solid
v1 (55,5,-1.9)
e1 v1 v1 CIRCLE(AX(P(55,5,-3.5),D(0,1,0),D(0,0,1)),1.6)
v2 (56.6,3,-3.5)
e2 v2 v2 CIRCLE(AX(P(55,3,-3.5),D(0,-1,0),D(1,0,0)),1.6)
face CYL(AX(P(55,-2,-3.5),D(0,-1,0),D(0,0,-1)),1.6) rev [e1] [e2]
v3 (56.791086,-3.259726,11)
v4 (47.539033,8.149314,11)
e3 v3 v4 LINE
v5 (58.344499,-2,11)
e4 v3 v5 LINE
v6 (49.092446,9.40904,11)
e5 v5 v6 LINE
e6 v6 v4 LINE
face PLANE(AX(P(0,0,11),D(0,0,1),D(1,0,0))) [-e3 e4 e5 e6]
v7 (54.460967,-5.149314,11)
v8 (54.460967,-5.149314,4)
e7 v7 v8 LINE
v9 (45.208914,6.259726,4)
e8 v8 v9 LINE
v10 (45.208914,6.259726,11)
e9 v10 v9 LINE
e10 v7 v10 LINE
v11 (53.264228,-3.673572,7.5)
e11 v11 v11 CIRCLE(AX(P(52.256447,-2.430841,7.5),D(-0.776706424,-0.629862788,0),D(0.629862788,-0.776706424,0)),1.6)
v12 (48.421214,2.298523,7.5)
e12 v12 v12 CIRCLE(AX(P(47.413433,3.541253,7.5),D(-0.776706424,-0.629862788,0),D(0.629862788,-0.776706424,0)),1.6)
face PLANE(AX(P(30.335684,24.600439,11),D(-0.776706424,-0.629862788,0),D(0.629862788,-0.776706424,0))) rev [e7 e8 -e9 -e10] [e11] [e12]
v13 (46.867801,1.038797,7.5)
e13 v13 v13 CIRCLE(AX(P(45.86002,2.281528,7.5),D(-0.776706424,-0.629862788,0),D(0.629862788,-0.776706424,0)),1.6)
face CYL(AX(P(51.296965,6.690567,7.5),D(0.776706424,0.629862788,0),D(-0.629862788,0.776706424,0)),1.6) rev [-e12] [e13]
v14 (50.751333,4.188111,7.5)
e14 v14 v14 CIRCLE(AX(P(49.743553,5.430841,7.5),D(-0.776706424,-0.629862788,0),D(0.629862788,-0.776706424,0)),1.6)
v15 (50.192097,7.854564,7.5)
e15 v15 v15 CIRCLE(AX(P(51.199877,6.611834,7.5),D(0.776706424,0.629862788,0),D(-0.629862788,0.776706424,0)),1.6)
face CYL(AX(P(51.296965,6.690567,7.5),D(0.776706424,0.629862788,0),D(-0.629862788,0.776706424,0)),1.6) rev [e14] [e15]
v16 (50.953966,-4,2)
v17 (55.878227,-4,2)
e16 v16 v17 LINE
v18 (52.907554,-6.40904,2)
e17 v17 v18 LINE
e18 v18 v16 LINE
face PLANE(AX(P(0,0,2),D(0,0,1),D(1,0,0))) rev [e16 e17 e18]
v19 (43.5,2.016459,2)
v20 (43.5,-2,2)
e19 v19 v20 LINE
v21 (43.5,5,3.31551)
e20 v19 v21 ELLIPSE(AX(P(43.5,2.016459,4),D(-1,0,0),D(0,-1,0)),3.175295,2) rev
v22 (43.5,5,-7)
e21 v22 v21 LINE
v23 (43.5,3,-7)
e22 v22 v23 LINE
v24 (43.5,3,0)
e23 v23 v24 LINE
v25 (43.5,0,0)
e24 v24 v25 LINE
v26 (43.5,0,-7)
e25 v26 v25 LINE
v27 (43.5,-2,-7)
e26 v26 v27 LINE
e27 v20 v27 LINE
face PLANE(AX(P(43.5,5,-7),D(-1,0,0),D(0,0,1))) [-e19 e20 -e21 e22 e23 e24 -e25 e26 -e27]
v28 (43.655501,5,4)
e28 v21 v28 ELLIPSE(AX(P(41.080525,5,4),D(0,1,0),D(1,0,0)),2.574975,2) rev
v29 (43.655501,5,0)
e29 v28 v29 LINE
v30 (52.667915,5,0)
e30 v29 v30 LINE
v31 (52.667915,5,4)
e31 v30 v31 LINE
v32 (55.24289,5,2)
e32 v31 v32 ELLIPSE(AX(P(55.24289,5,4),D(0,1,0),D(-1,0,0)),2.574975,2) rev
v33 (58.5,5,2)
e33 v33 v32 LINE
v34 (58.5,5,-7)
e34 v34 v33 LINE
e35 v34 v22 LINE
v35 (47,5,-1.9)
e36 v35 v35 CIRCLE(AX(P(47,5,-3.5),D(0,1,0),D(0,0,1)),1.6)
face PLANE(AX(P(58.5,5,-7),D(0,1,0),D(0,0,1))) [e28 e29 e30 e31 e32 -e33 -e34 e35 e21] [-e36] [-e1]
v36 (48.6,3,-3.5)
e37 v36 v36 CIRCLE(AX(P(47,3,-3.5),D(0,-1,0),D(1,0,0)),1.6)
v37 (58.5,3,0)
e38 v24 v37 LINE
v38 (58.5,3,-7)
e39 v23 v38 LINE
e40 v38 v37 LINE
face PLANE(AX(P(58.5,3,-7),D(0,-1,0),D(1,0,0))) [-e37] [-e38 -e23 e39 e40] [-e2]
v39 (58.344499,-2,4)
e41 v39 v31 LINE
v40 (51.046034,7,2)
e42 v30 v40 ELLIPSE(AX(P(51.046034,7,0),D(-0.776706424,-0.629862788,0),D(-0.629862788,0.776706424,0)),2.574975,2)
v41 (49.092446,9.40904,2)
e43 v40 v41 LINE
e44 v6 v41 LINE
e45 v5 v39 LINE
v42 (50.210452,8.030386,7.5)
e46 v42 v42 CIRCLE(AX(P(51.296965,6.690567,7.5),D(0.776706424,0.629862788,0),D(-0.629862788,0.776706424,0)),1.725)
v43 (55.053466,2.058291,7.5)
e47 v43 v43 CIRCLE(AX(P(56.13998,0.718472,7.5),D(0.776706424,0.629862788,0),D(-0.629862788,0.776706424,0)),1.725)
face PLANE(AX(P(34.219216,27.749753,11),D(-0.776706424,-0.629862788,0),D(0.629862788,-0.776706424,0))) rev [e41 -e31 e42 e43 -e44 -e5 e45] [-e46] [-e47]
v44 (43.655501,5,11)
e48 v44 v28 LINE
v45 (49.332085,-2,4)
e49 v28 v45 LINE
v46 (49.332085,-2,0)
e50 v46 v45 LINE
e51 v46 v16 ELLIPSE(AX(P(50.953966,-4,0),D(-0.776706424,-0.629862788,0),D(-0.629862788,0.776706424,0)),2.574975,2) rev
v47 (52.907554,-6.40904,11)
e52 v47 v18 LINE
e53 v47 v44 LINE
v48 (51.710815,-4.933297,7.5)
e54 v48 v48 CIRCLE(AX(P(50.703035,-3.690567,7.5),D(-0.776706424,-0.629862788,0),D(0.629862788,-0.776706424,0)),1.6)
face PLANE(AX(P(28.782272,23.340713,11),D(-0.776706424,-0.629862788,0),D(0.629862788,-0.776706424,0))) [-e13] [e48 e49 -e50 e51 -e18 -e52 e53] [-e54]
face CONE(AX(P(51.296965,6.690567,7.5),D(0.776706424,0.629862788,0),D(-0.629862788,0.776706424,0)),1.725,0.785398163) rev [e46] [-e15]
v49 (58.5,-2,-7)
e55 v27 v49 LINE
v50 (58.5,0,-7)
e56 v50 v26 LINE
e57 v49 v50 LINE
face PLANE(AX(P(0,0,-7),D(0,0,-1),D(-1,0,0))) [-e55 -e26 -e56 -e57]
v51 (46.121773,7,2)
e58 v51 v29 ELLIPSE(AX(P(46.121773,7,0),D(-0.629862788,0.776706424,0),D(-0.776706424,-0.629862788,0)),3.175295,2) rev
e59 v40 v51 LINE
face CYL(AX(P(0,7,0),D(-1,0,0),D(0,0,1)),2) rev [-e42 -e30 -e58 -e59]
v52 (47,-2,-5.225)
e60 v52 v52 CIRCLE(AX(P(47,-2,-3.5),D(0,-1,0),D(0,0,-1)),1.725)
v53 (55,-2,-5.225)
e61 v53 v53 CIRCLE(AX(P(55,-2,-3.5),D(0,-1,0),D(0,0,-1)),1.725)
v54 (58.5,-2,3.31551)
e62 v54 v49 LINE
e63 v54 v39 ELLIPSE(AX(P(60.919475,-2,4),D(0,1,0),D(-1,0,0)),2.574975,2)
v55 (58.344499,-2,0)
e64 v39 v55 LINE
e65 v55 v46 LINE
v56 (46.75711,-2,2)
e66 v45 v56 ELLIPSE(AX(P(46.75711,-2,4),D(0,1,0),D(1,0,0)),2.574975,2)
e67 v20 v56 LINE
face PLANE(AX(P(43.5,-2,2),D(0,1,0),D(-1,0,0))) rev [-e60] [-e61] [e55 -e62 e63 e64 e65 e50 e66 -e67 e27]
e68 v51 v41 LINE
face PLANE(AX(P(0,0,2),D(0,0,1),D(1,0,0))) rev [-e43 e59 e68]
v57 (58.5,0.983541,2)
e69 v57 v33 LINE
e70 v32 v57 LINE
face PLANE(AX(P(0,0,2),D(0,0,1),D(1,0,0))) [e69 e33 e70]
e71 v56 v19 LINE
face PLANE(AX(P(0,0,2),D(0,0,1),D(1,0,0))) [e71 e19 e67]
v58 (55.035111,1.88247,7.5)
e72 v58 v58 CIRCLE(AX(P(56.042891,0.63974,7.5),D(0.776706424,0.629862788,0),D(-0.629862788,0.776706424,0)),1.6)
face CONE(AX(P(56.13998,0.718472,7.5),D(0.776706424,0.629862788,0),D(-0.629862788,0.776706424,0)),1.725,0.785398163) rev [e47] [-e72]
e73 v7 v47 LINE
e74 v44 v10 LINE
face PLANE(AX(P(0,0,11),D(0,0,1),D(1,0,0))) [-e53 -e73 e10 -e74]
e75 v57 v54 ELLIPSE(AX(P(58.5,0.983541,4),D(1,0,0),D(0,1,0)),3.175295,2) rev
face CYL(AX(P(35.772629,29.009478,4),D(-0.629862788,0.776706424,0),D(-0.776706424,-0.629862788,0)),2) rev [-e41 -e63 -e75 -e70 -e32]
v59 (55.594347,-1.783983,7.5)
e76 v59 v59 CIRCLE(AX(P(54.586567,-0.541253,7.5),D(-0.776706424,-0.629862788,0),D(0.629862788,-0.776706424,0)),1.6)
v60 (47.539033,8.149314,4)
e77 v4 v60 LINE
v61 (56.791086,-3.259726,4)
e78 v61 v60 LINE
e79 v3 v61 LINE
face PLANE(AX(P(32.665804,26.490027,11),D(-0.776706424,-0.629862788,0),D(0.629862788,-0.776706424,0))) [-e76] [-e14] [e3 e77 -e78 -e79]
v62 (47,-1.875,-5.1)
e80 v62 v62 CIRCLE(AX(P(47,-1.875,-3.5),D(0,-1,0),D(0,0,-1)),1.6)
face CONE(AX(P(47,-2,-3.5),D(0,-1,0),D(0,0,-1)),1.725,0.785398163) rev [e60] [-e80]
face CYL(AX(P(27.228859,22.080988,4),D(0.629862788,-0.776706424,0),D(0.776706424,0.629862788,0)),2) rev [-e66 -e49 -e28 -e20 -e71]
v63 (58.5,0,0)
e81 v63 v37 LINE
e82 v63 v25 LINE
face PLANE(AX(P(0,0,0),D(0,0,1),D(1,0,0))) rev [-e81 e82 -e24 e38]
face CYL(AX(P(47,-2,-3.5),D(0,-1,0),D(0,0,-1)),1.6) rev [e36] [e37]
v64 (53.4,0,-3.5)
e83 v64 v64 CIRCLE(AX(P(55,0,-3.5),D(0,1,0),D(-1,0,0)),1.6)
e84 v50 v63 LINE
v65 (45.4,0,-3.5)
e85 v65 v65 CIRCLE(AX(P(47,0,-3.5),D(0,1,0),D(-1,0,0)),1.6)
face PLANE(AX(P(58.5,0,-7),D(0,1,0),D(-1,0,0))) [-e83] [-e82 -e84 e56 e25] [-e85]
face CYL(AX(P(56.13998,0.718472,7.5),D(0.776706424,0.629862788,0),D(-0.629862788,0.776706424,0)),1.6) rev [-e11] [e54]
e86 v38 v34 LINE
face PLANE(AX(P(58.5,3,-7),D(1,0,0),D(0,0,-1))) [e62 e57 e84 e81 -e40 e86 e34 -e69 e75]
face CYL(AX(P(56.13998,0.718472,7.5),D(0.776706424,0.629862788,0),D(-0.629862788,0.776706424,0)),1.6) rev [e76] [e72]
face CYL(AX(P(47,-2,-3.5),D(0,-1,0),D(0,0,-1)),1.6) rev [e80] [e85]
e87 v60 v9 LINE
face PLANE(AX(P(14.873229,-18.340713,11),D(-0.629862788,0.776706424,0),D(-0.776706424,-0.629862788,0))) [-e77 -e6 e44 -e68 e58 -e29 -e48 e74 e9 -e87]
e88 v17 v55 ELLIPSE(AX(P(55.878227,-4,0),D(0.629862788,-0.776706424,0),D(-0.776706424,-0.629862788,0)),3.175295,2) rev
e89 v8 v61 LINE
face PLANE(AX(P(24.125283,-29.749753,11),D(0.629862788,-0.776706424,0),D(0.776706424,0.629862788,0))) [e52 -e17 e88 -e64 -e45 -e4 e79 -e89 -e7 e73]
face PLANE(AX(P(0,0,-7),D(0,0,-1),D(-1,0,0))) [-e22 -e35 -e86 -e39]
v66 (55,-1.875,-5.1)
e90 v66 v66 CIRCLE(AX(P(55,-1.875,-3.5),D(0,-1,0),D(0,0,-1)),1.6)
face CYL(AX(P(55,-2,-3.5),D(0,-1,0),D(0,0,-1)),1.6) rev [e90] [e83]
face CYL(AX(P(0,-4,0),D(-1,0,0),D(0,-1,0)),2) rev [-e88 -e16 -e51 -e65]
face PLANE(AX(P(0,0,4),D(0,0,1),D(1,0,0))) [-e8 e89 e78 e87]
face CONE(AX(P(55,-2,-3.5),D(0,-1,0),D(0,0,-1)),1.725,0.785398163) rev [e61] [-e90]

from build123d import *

# Parameters (mm, degrees)
SKETCH1_W                      = 15
SKETCH1_H                      = 2
BOSS_EXTRUDE1_DEPTH            = 7
BOSS_EXTRUDE1_2_DEPTH          = 7
SKETCH2_W                      = 15
SKETCH2_H                      = 7
BOSS_EXTRUDE2_DEPTH            = 2
BOSS_EXTRUDE3_DEPTH            = 9
BOSS_EXTRUDE4_DEPTH            = 2
M3_CLEARANCE_HOLE1_D           = 3.2
M3_CLEARANCE_HOLE1_CSINK_D     = 3.45
M3_CLEARANCE_HOLE1_CSINK_ANGLE = 90
M3_CLEARANCE_HOLE2_D           = 3.2
M3_CLEARANCE_HOLE2_CSINK_D     = 3.45
M3_CLEARANCE_HOLE2_CSINK_ANGLE = 90
FILLET2_R                      = 2
FILLET3_R                      = 2


with BuildPart() as part:
    # Sketch1 → Boss-Extrude1 (new body)
    with BuildSketch(Plane.XY):
        with Locations((51, 4)):
            Rectangle(SKETCH1_W, SKETCH1_H)
    extrude(amount=-BOSS_EXTRUDE1_DEPTH)



with BuildPart() as body_2:
    # Sketch1 → Boss-Extrude1 2 (new body)
    with BuildSketch(Plane.XY):
        with Locations((51, -1)):
            Rectangle(SKETCH1_W, SKETCH1_H)
    extrude(amount=-BOSS_EXTRUDE1_2_DEPTH)


with BuildPart() as part_1:
    add(part.part)

    add(body_2.part)  # Boss-Extrude2 merges body 2
    # Sketch2 → Boss-Extrude2 (add)
    with BuildSketch(Plane.XY):
        with Locations((51, 1.5)):
            Rectangle(SKETCH2_W, SKETCH2_H)
    extrude(amount=BOSS_EXTRUDE2_DEPTH)

    # Sketch3 → Boss-Extrude3 (add)
    with BuildSketch(Plane.XY.offset(2)):
        Polygon((49.332085067, -2), (51.907060552, -2), (46.23047622, 5), (43.655500735, 5), align=None)
        Polygon((52.9075543, -6.409039515), (54.460967148, -5.149313939), (51.907060552, -2), (49.332085067, -2), align=None)
        Polygon((50.092939448, 5), (55.76952378, -2), (58.344499265, -2), (52.667914933, 5), align=None)
        Polygon((47.539032852, 8.149313939), (50.092939448, 5), (52.667914933, 5), (49.0924457, 9.409039515), align=None)
        Polygon((43.655500735, 5), (46.23047622, 5), (45.208913582, 6.259725576), align=None)
        Polygon((58.344499265, -2), (55.76952378, -2), (56.791086418, -3.259725576), align=None)
    extrude(amount=BOSS_EXTRUDE3_DEPTH)

    # Sketch4 → Boss-Extrude4 (add)
    with BuildSketch(Plane.XY.offset(2)):
        Polygon((43.655500735, 5), (52.9075543, -6.409039515), (58.344499265, -2), (49.0924457, 9.409039515), align=None)
    extrude(amount=BOSS_EXTRUDE4_DEPTH)

    # M3 Clearance Hole1 (through all)
    with Locations(Plane(origin=(34.219216483, 27.749752594, 0), x_dir=(0, 0, -1), z_dir=(0.7767064235919557, 0.6298627878760529, 0))):
        with Locations((-7.5, -34.802441812), (-7.5, -27.113443281)):
            CounterSinkHole(M3_CLEARANCE_HOLE1_D / 2, M3_CLEARANCE_HOLE1_CSINK_D / 2, counter_sink_angle=M3_CLEARANCE_HOLE1_CSINK_ANGLE)

    # M3 Clearance Hole2 (through all)
    with Locations(Plane(origin=(0, -2, 0), x_dir=(-1, 0, 0), z_dir=(0, -1, 0))):
        with Locations((-47, 3.5), (-55, 3.5)):
            CounterSinkHole(M3_CLEARANCE_HOLE2_D / 2, M3_CLEARANCE_HOLE2_CSINK_D / 2, counter_sink_angle=M3_CLEARANCE_HOLE2_CSINK_ANGLE)

    # Fillet2
    # the kernel refuses this fillet: 2 mm, written as the material it adds along each edge
    with BuildSketch(Plane(origin=(63.344499265, -2, 2), x_dir=(0, -1, 0), z_dir=(-1, 0, 0))) as fillet2_piece_1_section:
        with BuildLine():
            CenterArc((FILLET2_R, -FILLET2_R), FILLET2_R, 90, 90)
            Line((0, -FILLET2_R), (0, 0))
            Line((0, 0), (FILLET2_R, 0))
        make_face()
    fillet2_piece_1 = extrude(amount=19.012414198, mode=Mode.PRIVATE)
    fillet2_piece_1 = split(fillet2_piece_1, bisect_by=Plane(origin=(51.286566394, -4.410141115, 1.532384034), z_dir=(0.776706423591956, 0.6298627878760524, 0)), keep=Keep.TOP, mode=Mode.PRIVATE)
    fillet2_piece_1 = split(fillet2_piece_1, bisect_by=Plane(origin=(55.372467702, -4.410141115, 1.532384034), z_dir=(-0.6298627878760494, 0.7767064235919585, 0)), keep=Keep.TOP, mode=Mode.PRIVATE)
    add(fillet2_piece_1)
    with BuildSketch(Plane(origin=(38.655500735, 5, 2), x_dir=(0, 0, -1), z_dir=(1, 0, 0))) as fillet2_piece_2_section:
        with BuildLine():
            CenterArc((FILLET2_R, FILLET2_R), FILLET2_R, 180, 90)
            Line((0, FILLET2_R), (0, 0))
            Line((0, 0), (FILLET2_R, 0))
        make_face()
    fillet2_piece_2 = extrude(amount=19.012414198, mode=Mode.PRIVATE)
    fillet2_piece_2 = split(fillet2_piece_2, bisect_by=Plane(origin=(46.627532298, 7.410141115, 1.532384034), z_dir=(0.6298627878760538, -0.776706423591955, 0)), keep=Keep.TOP, mode=Mode.PRIVATE)
    fillet2_piece_2 = split(fillet2_piece_2, bisect_by=Plane(origin=(50.713433606, 7.410141115, 1.532384034), z_dir=(-0.776706423591956, -0.6298627878760528, 0)), keep=Keep.TOP, mode=Mode.PRIVATE)
    add(fillet2_piece_2)

    # Fillet3
    # the kernel refuses this fillet: 2 mm, written as the material it adds along each edge
    with BuildSketch(Plane(origin=(52.481399006, -5.883532118, 2), x_dir=(-0.7767064235919561, -0.6298627878760525, 0), z_dir=(-0.6298627878760524, 0.7767064235919561, 0))) as fillet3_piece_1_section:
        with BuildLine():
            CenterArc((FILLET3_R, FILLET3_R), FILLET3_R, 180, 90)
            Line((0, FILLET3_R), (0, 0))
            Line((0, 0), (FILLET3_R, 0))
        make_face()
    fillet3_piece_1 = extrude(amount=19.012414198, mode=Mode.PRIVATE)
    fillet3_piece_1 = split(fillet3_piece_1, bisect_by=Plane(origin=(46.164389013, 5, 2.465360244), z_dir=(0, -1, 0)), keep=Keep.TOP, mode=Mode.PRIVATE)
    fillet3_piece_1 = split(fillet3_piece_1, bisect_by=Plane(origin=(43.5, 1.248668865, 2.465360244), z_dir=(1, 0, 0)), keep=Keep.TOP, mode=Mode.PRIVATE)
    fillet3_piece_1 = split(fillet3_piece_1, bisect_by=Plane(origin=(46.164389013, -2, 2.465360244), z_dir=(0, 1, 0)), keep=Keep.TOP, mode=Mode.PRIVATE)
    add(fillet3_piece_1)
    with BuildSketch(Plane(origin=(61.493813205, -5.883532118, 2), x_dir=(0, 0, 1), z_dir=(-0.6298627878760524, 0.776706423591956, 0))) as fillet3_piece_2_section:
        with BuildLine():
            CenterArc((FILLET3_R, FILLET3_R), FILLET3_R, 180, 90)
            Line((0, FILLET3_R), (0, 0))
            Line((0, 0), (FILLET3_R, 0))
        make_face()
    fillet3_piece_2 = extrude(amount=19.012414198, mode=Mode.PRIVATE)
    fillet3_piece_2 = split(fillet3_piece_2, bisect_by=Plane(origin=(58.444828917, 5, 2.691548942), z_dir=(0, -1, 0)), keep=Keep.TOP, mode=Mode.PRIVATE)
    fillet3_piece_2 = split(fillet3_piece_2, bisect_by=Plane(origin=(58.5, -1.960151195, 2.691548942), z_dir=(-1, 0, 0)), keep=Keep.TOP, mode=Mode.PRIVATE)
    fillet3_piece_2 = split(fillet3_piece_2, bisect_by=Plane(origin=(58.444828917, -2, 2.691548942), z_dir=(0, 1, 0)), keep=Keep.TOP, mode=Mode.PRIVATE)
    add(fillet3_piece_2)


solid = part_1.part
